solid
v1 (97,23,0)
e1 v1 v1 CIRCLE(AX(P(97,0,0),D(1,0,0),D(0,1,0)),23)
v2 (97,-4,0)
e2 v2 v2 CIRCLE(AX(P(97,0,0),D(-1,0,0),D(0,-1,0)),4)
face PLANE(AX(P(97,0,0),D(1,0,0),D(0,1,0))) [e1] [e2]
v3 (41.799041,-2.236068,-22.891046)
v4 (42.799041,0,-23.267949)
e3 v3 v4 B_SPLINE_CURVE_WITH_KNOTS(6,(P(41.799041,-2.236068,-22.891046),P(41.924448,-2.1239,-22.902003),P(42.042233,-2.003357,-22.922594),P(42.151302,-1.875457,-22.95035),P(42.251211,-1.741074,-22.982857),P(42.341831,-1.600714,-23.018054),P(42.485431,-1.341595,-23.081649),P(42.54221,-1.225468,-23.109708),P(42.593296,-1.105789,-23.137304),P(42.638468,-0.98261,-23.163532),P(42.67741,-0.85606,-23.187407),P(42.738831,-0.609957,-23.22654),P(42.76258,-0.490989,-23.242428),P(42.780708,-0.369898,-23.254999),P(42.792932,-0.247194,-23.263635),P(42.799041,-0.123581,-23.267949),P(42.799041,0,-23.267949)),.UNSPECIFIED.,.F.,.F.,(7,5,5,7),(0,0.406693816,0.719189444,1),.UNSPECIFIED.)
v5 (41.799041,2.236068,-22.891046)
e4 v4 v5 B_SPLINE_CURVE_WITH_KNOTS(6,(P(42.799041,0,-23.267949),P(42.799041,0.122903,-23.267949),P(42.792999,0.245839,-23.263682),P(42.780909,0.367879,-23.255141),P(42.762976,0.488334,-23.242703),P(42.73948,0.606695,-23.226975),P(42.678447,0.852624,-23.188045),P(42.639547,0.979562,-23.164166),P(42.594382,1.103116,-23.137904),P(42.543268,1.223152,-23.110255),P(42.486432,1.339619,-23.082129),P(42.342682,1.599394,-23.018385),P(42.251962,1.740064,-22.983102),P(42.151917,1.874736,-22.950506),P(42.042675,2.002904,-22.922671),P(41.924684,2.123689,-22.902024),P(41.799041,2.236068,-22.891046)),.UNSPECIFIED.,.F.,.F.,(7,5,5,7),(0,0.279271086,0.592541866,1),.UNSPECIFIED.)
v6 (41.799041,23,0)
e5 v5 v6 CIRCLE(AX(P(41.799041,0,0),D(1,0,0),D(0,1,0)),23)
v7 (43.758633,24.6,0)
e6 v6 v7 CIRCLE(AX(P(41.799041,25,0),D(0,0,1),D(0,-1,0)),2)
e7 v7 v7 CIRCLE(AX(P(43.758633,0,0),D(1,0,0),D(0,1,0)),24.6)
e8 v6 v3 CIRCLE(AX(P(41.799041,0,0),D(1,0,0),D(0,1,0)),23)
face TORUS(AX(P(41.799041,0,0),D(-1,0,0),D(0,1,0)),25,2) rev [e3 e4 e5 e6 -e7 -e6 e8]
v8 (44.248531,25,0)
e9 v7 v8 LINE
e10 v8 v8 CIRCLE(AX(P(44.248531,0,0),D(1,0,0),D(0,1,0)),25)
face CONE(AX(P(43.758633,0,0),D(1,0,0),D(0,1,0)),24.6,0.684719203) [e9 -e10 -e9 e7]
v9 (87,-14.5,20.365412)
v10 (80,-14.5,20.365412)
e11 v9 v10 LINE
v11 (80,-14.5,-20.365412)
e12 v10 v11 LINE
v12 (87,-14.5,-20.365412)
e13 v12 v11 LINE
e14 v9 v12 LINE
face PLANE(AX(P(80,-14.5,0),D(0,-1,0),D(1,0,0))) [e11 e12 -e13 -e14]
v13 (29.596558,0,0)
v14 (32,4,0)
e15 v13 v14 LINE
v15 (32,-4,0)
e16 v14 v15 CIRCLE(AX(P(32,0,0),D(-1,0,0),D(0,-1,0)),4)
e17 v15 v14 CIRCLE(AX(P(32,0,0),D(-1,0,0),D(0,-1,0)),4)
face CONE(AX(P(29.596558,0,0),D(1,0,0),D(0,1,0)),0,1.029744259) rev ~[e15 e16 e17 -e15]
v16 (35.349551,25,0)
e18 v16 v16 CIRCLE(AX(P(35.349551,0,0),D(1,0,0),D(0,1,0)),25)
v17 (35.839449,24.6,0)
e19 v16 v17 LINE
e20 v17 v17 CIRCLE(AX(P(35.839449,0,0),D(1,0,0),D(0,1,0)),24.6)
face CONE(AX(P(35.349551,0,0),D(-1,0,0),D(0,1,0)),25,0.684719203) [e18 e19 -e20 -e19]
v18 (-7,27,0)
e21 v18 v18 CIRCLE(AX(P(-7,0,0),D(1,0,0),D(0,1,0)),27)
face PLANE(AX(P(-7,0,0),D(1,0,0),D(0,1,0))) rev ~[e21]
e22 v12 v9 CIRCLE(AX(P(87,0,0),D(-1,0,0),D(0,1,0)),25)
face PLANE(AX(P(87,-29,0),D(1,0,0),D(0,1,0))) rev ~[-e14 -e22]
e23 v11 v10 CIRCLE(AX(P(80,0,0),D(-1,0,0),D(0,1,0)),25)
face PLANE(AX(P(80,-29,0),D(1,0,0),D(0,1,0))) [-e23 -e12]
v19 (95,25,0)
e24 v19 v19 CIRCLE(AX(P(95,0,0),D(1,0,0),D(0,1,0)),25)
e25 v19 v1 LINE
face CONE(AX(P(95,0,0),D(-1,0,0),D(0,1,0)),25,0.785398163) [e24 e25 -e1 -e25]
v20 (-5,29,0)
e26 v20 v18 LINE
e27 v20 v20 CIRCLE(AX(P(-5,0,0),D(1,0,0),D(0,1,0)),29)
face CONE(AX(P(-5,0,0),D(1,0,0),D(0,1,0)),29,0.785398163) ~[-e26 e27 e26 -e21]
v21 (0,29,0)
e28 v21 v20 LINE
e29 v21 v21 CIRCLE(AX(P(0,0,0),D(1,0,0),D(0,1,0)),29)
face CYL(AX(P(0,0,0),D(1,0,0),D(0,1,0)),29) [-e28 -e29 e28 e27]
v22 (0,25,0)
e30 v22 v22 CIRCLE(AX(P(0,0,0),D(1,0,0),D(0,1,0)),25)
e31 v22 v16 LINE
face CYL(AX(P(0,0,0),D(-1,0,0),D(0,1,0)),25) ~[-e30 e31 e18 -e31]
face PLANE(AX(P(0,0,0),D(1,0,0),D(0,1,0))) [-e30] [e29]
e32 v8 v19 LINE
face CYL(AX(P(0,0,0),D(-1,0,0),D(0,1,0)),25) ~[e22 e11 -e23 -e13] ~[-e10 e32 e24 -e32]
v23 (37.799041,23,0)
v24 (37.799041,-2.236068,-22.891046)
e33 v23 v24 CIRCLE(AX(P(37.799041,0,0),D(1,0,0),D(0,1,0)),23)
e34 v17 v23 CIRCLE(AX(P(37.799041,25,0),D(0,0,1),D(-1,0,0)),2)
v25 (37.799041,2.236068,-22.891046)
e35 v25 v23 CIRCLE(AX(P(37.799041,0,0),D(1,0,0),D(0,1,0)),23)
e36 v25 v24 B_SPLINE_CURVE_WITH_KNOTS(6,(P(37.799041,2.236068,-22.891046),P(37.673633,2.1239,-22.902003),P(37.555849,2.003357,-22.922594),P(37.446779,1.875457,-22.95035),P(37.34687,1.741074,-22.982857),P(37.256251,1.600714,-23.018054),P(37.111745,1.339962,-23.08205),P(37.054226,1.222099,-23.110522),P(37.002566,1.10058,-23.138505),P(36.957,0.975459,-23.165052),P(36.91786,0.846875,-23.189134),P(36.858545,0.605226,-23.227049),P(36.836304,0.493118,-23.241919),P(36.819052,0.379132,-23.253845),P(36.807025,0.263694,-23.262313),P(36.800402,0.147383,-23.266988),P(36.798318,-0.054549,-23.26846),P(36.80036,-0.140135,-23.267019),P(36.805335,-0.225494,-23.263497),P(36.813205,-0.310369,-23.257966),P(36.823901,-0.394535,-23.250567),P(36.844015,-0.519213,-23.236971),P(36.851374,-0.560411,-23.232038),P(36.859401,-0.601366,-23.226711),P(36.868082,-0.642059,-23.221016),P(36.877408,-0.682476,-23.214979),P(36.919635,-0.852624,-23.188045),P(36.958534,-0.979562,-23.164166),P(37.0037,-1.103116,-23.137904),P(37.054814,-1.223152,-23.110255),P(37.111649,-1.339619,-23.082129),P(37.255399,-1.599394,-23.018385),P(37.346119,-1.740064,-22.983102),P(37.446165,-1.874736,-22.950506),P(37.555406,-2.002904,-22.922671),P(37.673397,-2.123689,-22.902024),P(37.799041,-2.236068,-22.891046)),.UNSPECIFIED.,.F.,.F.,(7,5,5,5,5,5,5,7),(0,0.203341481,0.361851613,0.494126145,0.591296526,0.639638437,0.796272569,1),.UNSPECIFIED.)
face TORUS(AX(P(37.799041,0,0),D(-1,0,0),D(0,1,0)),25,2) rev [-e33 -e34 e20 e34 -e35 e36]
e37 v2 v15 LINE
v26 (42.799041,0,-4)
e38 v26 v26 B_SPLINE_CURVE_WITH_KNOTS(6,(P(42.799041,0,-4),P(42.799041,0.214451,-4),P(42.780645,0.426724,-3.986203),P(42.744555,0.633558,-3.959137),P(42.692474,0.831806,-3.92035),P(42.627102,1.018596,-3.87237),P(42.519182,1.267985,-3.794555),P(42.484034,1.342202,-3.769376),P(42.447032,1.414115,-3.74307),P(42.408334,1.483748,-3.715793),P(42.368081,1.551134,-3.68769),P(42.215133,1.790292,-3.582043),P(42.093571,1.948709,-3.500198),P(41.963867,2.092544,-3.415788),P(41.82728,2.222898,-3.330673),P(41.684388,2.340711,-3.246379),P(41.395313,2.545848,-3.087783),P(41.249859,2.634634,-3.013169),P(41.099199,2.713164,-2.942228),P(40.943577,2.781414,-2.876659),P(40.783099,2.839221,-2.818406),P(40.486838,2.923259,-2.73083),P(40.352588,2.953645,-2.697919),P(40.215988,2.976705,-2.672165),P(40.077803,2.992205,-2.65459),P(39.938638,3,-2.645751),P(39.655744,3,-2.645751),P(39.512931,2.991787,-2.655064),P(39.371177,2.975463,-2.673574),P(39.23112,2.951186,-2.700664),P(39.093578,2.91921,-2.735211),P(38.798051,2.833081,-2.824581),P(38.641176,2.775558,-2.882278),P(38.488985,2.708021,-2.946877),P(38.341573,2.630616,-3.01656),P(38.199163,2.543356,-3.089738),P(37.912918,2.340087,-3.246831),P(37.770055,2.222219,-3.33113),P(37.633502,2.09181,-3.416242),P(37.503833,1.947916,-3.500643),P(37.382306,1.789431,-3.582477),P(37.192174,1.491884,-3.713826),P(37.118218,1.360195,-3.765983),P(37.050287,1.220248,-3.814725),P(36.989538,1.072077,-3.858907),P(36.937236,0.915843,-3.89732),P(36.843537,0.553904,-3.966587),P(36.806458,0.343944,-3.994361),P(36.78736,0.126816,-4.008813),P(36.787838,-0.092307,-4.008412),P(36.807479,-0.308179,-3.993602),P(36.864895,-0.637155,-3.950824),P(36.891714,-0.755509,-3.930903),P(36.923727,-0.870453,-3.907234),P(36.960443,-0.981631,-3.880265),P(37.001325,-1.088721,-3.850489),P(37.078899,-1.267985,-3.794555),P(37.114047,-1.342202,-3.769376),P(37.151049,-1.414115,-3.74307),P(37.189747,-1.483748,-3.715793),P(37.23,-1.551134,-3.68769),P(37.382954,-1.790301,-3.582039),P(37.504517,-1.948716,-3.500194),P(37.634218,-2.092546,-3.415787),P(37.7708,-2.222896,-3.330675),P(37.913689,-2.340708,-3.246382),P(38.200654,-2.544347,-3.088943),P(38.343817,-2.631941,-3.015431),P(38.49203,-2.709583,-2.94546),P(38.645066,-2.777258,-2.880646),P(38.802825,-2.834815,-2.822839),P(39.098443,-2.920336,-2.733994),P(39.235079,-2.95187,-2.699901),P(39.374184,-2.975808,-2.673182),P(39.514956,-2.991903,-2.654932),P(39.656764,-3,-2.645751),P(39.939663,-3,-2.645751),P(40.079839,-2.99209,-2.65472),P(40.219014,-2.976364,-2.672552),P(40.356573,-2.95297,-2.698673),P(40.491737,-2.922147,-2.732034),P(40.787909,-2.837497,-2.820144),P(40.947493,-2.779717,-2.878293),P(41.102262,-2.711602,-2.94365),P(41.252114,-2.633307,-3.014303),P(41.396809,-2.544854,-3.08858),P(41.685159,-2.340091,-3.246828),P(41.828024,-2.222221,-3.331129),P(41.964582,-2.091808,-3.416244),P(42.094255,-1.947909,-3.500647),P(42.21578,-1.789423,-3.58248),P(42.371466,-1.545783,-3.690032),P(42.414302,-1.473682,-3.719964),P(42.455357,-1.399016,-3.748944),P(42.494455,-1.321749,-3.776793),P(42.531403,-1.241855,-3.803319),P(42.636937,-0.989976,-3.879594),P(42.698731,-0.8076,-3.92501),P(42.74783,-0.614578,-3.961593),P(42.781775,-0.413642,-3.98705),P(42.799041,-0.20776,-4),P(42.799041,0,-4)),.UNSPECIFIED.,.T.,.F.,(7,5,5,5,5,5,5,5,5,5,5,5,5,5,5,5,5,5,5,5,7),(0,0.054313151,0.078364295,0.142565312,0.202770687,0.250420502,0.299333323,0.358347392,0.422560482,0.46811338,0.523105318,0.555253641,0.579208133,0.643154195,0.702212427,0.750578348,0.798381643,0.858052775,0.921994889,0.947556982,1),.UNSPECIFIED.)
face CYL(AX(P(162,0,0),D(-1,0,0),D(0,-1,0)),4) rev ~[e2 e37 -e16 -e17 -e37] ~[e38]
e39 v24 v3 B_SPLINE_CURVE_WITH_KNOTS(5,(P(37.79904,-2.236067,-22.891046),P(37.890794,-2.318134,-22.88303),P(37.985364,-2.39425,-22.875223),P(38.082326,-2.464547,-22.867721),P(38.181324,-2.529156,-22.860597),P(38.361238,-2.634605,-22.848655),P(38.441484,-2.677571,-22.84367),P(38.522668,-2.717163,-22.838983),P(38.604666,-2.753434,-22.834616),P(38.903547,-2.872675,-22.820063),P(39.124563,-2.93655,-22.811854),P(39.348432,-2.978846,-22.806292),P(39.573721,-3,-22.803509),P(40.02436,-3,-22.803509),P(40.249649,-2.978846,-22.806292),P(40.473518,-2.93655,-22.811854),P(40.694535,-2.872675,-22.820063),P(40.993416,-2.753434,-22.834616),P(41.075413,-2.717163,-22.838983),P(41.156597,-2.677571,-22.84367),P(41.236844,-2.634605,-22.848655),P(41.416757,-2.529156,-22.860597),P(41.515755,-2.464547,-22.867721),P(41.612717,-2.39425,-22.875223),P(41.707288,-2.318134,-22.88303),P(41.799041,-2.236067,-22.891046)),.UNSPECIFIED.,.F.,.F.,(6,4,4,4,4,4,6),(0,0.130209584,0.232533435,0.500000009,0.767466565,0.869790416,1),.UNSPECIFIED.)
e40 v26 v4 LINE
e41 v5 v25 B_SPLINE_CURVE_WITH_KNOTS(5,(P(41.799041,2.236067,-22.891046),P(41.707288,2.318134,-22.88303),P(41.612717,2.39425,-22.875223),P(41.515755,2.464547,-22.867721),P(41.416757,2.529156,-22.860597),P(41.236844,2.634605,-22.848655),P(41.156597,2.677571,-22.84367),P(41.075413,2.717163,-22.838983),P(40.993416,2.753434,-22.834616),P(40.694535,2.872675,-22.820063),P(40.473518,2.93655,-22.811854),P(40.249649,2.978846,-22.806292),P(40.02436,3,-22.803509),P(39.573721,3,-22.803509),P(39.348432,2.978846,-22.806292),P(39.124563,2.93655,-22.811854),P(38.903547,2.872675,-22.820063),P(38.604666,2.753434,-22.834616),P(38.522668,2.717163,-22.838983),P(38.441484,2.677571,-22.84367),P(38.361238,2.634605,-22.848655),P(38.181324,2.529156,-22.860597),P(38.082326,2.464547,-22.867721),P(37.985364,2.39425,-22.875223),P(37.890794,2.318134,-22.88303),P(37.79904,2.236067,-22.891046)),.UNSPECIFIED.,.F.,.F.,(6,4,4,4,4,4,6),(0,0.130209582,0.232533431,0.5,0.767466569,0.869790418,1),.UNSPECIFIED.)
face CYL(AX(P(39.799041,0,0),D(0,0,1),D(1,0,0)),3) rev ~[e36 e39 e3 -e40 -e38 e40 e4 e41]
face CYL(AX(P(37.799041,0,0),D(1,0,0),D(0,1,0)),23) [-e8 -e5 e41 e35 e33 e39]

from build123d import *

# Parameters (mm, degrees)
F0_R      = 25
F1_DEPTH  = 97
F2_SIZE   = 2
F3_R      = 29
F4_DEPTH  = 7
F5_SIZE   = 2
F8_W      = 7
F8_H      = 14.5
F9_DEPTH  = 50
F11_D     = 8
F11_DEPTH = 65
F11_TIP   = 2.4034424761
F13_D     = 6
F13_DEPTH = 29.001


# Not quite as in the source:
# - a fillet or chamfer that OpenCascade refuses, or shapes differently, is made with other operations: its cross-section is extruded or revolved along the edge and cut away or added


with BuildPart() as f1:
    # F0 (on Right) → F1 (new body)
    with BuildSketch(Plane.YZ):
        Circle(F0_R)
    extrude(amount=F1_DEPTH)

    # F2
    f2_edges = [f1.edges().sort_by_distance(p)[0] for p in [
        (97, -25, 0),
    ]]
    chamfer(f2_edges, length=F2_SIZE)

    # F3 (on Right) → F4 (join)
    with BuildSketch(Plane.YZ):
        Circle(F3_R)
    extrude(amount=-F4_DEPTH)

    # F5
    f5_edges = [f1.edges().sort_by_distance(p)[0] for p in [
        (-7, -29, 0),
    ]]
    chamfer(f5_edges, length=F5_SIZE)

    # F6 (on Top) → F7 (revolve, cut)
    with BuildSketch(Plane.XY):
        with BuildLine():
            Line((43.7990407646, 27), (35.7990407646, 27))
            Line((35.7990407646, 27), (35.7990407646, 25))
            ThreePointArc((35.7990407646, 25), (36.3848272022, 23.5857864376), (37.7990407646, 23))
            Line((37.7990407646, 23), (41.7990407646, 23))
            ThreePointArc((41.7990407646, 23), (43.2132543269, 23.5857864376), (43.7990407646, 25))
            Line((43.7990407646, 25), (43.7990407646, 27))
        make_face()
    revolve(axis=Axis((58.3793800324, 0, 0), (1, 0, 0)), mode=Mode.SUBTRACT)

    # F8 (on Top) → F9 (cut, symmetric)
    with BuildSketch(Plane.XY):
        with Locations((83.5, -21.75)):
            Rectangle(F8_W, F8_H)
    extrude(amount=F9_DEPTH, both=True, mode=Mode.SUBTRACT)

    # F11
    with Locations(Plane.YZ.offset(97)):
        with Locations((0, 0)):
            Hole(F11_D / 2, depth=F11_DEPTH)
            with Locations((0, 0, -(F11_DEPTH + F11_TIP / 2))):  # 118° drill point
                Cone(0, F11_D / 2, F11_TIP, mode=Mode.SUBTRACT)

    # F13 (through all, one way)
    with BuildSketch(Plane.XY):
        with Locations((39.7990407646, 0)):
            Circle(F13_D / 2)
    extrude(amount=-F13_DEPTH, mode=Mode.SUBTRACT)

    # F14: chamfer of 0.5 on 2 edges, made by hand

    # F14_s1 → F14_t2 (revolve, cut)
    with BuildSketch(Plane.XY):
        with BuildLine():
            Line((35.3495510218, 25), (35.8394489703, 24.6))
            ThreePointArc((35.8394489703, 24.6), (35.8098979776, 24.7918871147), (35.7990407646, 25))
            Line((35.7990407646, 25), (35.3495510218, 25))
        make_face()
    revolve(axis=Axis((35.7990407646, 0, 0), (1, 0, 0)), mode=Mode.SUBTRACT)

    # F14_s3 → F14_t4 (revolve, cut)
    with BuildSketch(Plane.XY):
        with BuildLine():
            Line((43.7586325588, 24.6), (44.2485305074, 25))
            Line((44.2485305074, 25), (43.7990407646, 25))
            ThreePointArc((43.7990407646, 25), (43.7881835515, 24.7918871147), (43.7586325588, 24.6))
        make_face()
    revolve(axis=Axis((43.7990407646, 0, 0), (1, 0, 0)), mode=Mode.SUBTRACT)


solid = f1.part
